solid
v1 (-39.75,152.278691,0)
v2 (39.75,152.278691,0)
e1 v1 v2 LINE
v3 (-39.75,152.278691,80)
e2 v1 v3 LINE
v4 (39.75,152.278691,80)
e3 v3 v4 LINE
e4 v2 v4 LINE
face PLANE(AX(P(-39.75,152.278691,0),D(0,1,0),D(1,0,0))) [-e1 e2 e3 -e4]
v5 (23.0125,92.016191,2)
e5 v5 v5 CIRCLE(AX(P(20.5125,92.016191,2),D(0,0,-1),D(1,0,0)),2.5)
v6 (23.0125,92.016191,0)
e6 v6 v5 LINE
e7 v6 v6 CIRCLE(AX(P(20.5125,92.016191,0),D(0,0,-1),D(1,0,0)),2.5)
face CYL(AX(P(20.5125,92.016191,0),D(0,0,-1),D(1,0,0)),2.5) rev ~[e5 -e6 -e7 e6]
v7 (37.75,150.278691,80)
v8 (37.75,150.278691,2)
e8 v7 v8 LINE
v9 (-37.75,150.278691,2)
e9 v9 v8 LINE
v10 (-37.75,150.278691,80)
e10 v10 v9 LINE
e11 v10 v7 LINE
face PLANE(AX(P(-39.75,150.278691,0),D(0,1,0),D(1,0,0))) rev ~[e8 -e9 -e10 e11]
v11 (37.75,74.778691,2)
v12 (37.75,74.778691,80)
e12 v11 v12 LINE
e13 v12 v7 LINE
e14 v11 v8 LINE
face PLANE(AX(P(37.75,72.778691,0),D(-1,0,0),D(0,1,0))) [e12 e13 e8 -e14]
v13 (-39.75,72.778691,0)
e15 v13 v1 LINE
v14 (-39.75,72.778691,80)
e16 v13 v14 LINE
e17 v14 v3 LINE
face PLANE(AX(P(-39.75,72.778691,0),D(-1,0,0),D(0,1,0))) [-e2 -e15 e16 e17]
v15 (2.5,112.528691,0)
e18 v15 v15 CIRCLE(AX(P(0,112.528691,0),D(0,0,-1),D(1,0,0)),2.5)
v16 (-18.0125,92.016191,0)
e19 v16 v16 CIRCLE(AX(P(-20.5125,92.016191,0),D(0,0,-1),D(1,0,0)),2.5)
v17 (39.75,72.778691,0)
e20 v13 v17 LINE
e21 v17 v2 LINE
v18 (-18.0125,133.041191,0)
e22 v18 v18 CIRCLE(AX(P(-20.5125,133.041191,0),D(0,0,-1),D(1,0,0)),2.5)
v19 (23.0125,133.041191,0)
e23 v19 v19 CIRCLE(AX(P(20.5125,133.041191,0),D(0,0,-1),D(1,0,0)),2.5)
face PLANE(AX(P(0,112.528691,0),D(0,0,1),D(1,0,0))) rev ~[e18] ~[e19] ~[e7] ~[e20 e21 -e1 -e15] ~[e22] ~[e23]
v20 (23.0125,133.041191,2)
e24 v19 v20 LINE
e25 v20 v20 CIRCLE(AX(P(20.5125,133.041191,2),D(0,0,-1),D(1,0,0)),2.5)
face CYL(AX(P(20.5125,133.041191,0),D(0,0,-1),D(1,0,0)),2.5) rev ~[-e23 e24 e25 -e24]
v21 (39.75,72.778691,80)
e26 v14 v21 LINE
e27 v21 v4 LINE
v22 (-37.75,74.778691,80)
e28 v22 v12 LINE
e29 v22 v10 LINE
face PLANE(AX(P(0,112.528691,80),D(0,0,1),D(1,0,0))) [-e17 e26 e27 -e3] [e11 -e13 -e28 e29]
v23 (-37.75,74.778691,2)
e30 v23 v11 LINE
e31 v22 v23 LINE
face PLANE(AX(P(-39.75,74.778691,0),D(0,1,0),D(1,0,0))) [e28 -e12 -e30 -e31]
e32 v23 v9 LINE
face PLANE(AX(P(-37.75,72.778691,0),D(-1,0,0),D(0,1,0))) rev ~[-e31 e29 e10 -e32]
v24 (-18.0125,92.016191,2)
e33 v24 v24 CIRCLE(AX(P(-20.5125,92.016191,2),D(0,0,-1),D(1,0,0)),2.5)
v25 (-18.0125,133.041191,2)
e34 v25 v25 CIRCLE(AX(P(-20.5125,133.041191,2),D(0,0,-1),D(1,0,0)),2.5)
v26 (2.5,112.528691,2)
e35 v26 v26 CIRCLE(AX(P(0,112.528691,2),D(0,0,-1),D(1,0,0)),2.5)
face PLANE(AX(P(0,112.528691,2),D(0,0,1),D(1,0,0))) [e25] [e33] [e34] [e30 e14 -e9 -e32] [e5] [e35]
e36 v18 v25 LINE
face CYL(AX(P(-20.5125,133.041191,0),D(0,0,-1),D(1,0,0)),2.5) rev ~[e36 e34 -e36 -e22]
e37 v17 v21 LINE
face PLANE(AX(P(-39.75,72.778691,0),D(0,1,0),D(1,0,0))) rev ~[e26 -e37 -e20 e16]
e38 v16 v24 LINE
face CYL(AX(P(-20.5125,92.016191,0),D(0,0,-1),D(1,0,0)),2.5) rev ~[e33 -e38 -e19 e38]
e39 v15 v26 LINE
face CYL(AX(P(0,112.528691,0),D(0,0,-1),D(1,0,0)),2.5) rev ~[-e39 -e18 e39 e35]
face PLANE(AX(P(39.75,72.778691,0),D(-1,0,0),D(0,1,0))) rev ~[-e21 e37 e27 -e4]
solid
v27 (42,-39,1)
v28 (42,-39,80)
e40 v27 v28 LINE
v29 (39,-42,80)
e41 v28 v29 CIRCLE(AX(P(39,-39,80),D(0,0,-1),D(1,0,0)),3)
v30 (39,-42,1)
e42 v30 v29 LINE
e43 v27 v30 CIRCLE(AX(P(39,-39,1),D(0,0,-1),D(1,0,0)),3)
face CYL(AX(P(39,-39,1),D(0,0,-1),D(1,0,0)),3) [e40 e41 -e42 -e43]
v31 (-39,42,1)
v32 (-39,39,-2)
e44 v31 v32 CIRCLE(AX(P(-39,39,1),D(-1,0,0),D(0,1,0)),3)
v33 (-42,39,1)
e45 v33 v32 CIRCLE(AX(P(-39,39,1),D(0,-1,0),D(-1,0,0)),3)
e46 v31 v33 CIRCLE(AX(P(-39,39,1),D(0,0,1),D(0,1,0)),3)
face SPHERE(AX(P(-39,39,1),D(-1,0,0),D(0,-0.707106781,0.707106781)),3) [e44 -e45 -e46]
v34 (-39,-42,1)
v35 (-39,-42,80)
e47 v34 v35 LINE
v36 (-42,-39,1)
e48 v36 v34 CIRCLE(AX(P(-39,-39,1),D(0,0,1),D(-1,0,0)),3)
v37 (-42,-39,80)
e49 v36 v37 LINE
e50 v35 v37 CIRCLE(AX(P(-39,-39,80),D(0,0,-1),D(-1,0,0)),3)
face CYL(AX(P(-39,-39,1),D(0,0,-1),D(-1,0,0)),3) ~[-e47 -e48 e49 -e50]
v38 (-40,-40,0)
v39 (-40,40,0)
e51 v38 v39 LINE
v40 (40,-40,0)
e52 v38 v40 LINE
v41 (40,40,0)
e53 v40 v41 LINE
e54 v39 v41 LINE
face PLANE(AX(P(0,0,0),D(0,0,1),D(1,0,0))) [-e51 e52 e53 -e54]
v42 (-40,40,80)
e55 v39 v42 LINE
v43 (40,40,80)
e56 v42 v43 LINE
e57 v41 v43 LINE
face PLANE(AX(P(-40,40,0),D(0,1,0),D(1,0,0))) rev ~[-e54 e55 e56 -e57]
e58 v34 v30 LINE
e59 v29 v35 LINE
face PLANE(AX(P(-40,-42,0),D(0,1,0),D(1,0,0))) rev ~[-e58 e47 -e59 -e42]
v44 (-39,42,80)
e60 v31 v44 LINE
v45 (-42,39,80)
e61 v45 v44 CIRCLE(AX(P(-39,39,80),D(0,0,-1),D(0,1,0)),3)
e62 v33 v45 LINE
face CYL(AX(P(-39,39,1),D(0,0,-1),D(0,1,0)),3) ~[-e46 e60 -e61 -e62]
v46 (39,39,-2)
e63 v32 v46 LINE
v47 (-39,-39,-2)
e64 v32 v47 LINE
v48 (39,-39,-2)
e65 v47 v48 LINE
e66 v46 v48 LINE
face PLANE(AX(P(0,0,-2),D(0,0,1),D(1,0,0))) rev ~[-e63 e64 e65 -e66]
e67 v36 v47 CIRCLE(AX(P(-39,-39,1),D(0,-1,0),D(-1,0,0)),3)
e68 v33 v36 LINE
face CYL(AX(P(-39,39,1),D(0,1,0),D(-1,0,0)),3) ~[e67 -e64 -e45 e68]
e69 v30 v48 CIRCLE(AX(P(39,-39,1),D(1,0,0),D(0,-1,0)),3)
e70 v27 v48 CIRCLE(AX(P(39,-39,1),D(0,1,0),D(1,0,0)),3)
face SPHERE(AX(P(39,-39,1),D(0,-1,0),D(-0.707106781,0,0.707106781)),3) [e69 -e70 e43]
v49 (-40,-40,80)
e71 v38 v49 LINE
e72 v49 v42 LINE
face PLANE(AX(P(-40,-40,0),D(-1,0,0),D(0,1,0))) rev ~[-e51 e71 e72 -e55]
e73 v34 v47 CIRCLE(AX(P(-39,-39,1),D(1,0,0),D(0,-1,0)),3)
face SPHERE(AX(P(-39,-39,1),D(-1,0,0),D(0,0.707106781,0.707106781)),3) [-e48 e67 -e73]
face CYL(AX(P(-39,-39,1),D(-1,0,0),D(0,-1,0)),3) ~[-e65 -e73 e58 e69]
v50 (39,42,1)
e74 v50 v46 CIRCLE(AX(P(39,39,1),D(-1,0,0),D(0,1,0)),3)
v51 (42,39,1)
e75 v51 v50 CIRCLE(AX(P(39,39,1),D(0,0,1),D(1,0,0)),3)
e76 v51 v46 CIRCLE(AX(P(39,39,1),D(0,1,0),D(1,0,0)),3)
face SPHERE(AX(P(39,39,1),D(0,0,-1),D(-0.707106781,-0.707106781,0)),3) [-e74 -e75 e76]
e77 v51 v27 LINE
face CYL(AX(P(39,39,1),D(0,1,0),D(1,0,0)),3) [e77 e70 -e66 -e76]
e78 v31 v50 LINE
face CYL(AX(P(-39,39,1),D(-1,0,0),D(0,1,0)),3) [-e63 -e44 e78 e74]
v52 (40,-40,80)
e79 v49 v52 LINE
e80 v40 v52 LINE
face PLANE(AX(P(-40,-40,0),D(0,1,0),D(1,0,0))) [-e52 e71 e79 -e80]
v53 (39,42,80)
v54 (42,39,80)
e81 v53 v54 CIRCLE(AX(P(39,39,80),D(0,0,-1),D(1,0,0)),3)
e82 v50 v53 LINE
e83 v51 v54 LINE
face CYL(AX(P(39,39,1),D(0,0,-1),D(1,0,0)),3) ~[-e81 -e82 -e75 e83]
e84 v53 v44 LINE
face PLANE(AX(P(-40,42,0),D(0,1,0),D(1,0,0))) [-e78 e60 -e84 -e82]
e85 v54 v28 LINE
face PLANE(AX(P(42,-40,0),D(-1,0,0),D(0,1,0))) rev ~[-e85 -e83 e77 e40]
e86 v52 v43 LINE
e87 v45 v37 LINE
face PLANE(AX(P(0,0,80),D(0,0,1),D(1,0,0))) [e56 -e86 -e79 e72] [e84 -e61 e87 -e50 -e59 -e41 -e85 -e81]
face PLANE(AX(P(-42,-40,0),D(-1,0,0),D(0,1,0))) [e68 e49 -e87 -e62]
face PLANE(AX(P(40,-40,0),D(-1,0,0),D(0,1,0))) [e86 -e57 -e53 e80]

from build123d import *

# Parameters (mm, degrees)
F0_W         = 80
F0_H         = 80
F1_DEPTH     = 80
F2_T         = 2
F3_W         = 79.5
F3_H         = 79.5
F4_DEPTH     = 80
F5_T         = -2
F6_T1_DEPTH  = 86.5
F6_T3_DEPTH  = 78
F6_T5_DEPTH  = 78
F6_S9_W      = 3
F6_S9_H      = 3
F6_T10_DEPTH = 3
F6_S15_W     = 3
F6_S15_H     = 3
F6_T16_DEPTH = 3
F6_S21_W     = 3
F6_S21_H     = 3
F6_T22_DEPTH = 3
F6_S27_W     = 3
F6_S27_H     = 3
F6_T28_DEPTH = 3
F8_R         = 2.5
F9_DEPTH     = 2.05


# Not quite as in the source:
# - a fillet or chamfer that OpenCascade refuses, or shapes differently, is made with other operations: its cross-section is extruded or revolved along the edge and cut away or added
# - a feature of the source that left no trace in its solid (it failed there, or was rolled back) is left out


with BuildPart() as f1:
    # F0 (on Top) → F1 (new body)
    with BuildSketch(Plane.XY):
        Rectangle(F0_W, F0_H)
    extrude(amount=F1_DEPTH)

    # F2
    f2_openings = [f1.faces().sort_by_distance(p)[0] for p in [
        (0, 0, 80),
    ]]
    offset(amount=F2_T, openings=f2_openings, kind=Kind.INTERSECTION)

    # F6: fillet of radius 3 on 8 edges, made by hand

    # F6_s2 → F6_t1 (cut)
    with BuildSketch(Plane.XY.offset(1)):
        with BuildLine():
            ThreePointArc((42, -39), (41.1213203436, -41.1213203436), (39, -42))
            Line((39, -42), (42, -42))
            Line((42, -42), (42, -39))
        make_face()
        with BuildLine():
            ThreePointArc((42, 39), (41.1213203436, 41.1213203436), (39, 42))
            Line((39, 42), (42, 42))
            Line((42, 42), (42, 39))
        make_face()
        with BuildLine():
            ThreePointArc((-39, 42), (-41.1213203436, 41.1213203436), (-42, 39))
            Line((-42, 39), (-42, 42))
            Line((-42, 42), (-39, 42))
        make_face()
        with BuildLine():
            ThreePointArc((-42, -39), (-41.1213203436, -41.1213203436), (-39, -42))
            Line((-39, -42), (-42, -42))
            Line((-42, -42), (-42, -39))
        make_face()
    extrude(amount=F6_T1_DEPTH, mode=Mode.SUBTRACT)

    # F6_s4 → F6_t3 (cut)
    with BuildSketch(Plane.XZ.offset(-39)):
        with BuildLine():
            ThreePointArc((42, 1), (41.1213203436, -1.1213203436), (39, -2))
            Line((39, -2), (42, -2))
            Line((42, -2), (42, 1))
        make_face()
        with BuildLine():
            ThreePointArc((-42, 1), (-41.1213203436, -1.1213203436), (-39, -2))
            Line((-39, -2), (-42, -2))
            Line((-42, -2), (-42, 1))
        make_face()
    extrude(amount=F6_T3_DEPTH, mode=Mode.SUBTRACT)

    # F6_s6 → F6_t5 (cut)
    with BuildSketch(Plane.YZ.offset(-39)):
        with BuildLine():
            ThreePointArc((42, 1), (41.1213203436, -1.1213203436), (39, -2))
            Line((39, -2), (42, -2))
            Line((42, -2), (42, 1))
        make_face()
        with BuildLine():
            ThreePointArc((-42, 1), (-41.1213203436, -1.1213203436), (-39, -2))
            Line((-39, -2), (-42, -2))
            Line((-42, -2), (-42, 1))
        make_face()
    extrude(amount=F6_T5_DEPTH, mode=Mode.SUBTRACT)


with BuildPart() as f4:
    # F3 (on Top) → F4 (new body)
    with BuildSketch(Plane.XY):
        with Locations((0, 112.5286910326)):
            Rectangle(F3_W, F3_H)
    extrude(amount=F4_DEPTH)

    # F5
    f5_openings = [f4.faces().sort_by_distance(p)[0] for p in [
        (0, 112.528691, 80),
    ]]
    offset(amount=F5_T, openings=f5_openings)

    # F8 (on face) → F9 (cut)
    with BuildSketch(Plane(origin=(0, 0, 0), x_dir=(1, 0, 0), z_dir=(0, 0, -1))):
        with Locations((20.5125, -133.0411910326)):
            Circle(F8_R)
        with Locations((-20.5125, -133.0411910326)):
            Circle(F8_R)
        with Locations((-20.5125, -92.0161910326)):
            Circle(F8_R)
        with Locations((0, -112.5286910326)):
            Circle(F8_R)
        with Locations((20.5125, -92.0161910326)):
            Circle(F8_R)
    extrude(amount=-F9_DEPTH, mode=Mode.SUBTRACT)


with BuildPart() as f6_tool8:
    # F6_s9 → F6_t10 (new body)
    with BuildSketch(Plane.XZ.offset(39)):
        with Locations((40.5, -0.5)):
            Rectangle(F6_S9_W, F6_S9_H)
    extrude(amount=F6_T10_DEPTH)

    # F6_s11 → F6_t12 (revolve, cut)
    with BuildSketch(Plane(origin=(39, -39, 1), x_dir=(-0.7071067812, 0, 0.7071067812), z_dir=(0.7071067812, 0, 0.7071067812))):
        with BuildLine():
            ThreePointArc((0, -3), (3, 0), (0, 3))
            Line((0, 3), (0, -3))
        make_face()
    revolve(axis=Axis((39, -39, 1), (0, -1, 0)), mode=Mode.SUBTRACT)


with BuildPart() as f1_1:
    add(f1.part)

    # F6_t7: cut F6_tool8
    add(f6_tool8.part, mode=Mode.SUBTRACT)


with BuildPart() as f6_tool14:
    # F6_s15 → F6_t16 (new body)
    with BuildSketch(Plane.XY.offset(1)):
        with Locations((40.5, 40.5)):
            Rectangle(F6_S15_W, F6_S15_H)
    extrude(amount=-F6_T16_DEPTH)

    # F6_s17 → F6_t18 (revolve, cut)
    with BuildSketch(Plane(origin=(39, 39, 1), x_dir=(-0.7071067812, -0.7071067812, 0), z_dir=(0.7071067812, -0.7071067812, 0))):
        with BuildLine():
            ThreePointArc((0, -3), (3, 0), (0, 3))
            Line((0, 3), (0, -3))
        make_face()
    revolve(axis=Axis((39, 39, 1), (0, 0, -1)), mode=Mode.SUBTRACT)


with BuildPart() as f1_2:
    add(f1_1.part)

    # F6_t13: cut F6_tool14
    add(f6_tool14.part, mode=Mode.SUBTRACT)


with BuildPart() as f6_tool20:
    # F6_s21 → F6_t22 (new body)
    with BuildSketch(Plane.YZ.offset(-39)):
        with Locations((40.5, -0.5)):
            Rectangle(F6_S21_W, F6_S21_H)
    extrude(amount=-F6_T22_DEPTH)

    # F6_s23 → F6_t24 (revolve, cut)
    with BuildSketch(Plane(origin=(-39, 39, 1), x_dir=(0, -0.7071067812, 0.7071067812), z_dir=(0, -0.7071067812, -0.7071067812))):
        with BuildLine():
            ThreePointArc((0, -3), (3, 0), (0, 3))
            Line((0, 3), (0, -3))
        make_face()
    revolve(axis=Axis((-39, 39, 1), (-1, 0, 0)), mode=Mode.SUBTRACT)


with BuildPart() as f1_3:
    add(f1_2.part)

    # F6_t19: cut F6_tool20
    add(f6_tool20.part, mode=Mode.SUBTRACT)


with BuildPart() as f6_tool26:
    # F6_s27 → F6_t28 (new body)
    with BuildSketch(Plane.YZ.offset(-39)):
        with Locations((-40.5, -0.5)):
            Rectangle(F6_S27_W, F6_S27_H)
    extrude(amount=-F6_T28_DEPTH)

    # F6_s29 → F6_t30 (revolve, cut)
    with BuildSketch(Plane(origin=(-39, -39, 1), x_dir=(0, 0.7071067812, 0.7071067812), z_dir=(0, -0.7071067812, 0.7071067812))):
        with BuildLine():
            ThreePointArc((0, -3), (3, 0), (0, 3))
            Line((0, 3), (0, -3))
        make_face()
    revolve(axis=Axis((-39, -39, 1), (-1, 0, 0)), mode=Mode.SUBTRACT)


with BuildPart() as f1_4:
    add(f1_3.part)

    # F6_t25: cut F6_tool26
    add(f6_tool26.part, mode=Mode.SUBTRACT)


solid = Compound([f4.part, f1_4.part])
